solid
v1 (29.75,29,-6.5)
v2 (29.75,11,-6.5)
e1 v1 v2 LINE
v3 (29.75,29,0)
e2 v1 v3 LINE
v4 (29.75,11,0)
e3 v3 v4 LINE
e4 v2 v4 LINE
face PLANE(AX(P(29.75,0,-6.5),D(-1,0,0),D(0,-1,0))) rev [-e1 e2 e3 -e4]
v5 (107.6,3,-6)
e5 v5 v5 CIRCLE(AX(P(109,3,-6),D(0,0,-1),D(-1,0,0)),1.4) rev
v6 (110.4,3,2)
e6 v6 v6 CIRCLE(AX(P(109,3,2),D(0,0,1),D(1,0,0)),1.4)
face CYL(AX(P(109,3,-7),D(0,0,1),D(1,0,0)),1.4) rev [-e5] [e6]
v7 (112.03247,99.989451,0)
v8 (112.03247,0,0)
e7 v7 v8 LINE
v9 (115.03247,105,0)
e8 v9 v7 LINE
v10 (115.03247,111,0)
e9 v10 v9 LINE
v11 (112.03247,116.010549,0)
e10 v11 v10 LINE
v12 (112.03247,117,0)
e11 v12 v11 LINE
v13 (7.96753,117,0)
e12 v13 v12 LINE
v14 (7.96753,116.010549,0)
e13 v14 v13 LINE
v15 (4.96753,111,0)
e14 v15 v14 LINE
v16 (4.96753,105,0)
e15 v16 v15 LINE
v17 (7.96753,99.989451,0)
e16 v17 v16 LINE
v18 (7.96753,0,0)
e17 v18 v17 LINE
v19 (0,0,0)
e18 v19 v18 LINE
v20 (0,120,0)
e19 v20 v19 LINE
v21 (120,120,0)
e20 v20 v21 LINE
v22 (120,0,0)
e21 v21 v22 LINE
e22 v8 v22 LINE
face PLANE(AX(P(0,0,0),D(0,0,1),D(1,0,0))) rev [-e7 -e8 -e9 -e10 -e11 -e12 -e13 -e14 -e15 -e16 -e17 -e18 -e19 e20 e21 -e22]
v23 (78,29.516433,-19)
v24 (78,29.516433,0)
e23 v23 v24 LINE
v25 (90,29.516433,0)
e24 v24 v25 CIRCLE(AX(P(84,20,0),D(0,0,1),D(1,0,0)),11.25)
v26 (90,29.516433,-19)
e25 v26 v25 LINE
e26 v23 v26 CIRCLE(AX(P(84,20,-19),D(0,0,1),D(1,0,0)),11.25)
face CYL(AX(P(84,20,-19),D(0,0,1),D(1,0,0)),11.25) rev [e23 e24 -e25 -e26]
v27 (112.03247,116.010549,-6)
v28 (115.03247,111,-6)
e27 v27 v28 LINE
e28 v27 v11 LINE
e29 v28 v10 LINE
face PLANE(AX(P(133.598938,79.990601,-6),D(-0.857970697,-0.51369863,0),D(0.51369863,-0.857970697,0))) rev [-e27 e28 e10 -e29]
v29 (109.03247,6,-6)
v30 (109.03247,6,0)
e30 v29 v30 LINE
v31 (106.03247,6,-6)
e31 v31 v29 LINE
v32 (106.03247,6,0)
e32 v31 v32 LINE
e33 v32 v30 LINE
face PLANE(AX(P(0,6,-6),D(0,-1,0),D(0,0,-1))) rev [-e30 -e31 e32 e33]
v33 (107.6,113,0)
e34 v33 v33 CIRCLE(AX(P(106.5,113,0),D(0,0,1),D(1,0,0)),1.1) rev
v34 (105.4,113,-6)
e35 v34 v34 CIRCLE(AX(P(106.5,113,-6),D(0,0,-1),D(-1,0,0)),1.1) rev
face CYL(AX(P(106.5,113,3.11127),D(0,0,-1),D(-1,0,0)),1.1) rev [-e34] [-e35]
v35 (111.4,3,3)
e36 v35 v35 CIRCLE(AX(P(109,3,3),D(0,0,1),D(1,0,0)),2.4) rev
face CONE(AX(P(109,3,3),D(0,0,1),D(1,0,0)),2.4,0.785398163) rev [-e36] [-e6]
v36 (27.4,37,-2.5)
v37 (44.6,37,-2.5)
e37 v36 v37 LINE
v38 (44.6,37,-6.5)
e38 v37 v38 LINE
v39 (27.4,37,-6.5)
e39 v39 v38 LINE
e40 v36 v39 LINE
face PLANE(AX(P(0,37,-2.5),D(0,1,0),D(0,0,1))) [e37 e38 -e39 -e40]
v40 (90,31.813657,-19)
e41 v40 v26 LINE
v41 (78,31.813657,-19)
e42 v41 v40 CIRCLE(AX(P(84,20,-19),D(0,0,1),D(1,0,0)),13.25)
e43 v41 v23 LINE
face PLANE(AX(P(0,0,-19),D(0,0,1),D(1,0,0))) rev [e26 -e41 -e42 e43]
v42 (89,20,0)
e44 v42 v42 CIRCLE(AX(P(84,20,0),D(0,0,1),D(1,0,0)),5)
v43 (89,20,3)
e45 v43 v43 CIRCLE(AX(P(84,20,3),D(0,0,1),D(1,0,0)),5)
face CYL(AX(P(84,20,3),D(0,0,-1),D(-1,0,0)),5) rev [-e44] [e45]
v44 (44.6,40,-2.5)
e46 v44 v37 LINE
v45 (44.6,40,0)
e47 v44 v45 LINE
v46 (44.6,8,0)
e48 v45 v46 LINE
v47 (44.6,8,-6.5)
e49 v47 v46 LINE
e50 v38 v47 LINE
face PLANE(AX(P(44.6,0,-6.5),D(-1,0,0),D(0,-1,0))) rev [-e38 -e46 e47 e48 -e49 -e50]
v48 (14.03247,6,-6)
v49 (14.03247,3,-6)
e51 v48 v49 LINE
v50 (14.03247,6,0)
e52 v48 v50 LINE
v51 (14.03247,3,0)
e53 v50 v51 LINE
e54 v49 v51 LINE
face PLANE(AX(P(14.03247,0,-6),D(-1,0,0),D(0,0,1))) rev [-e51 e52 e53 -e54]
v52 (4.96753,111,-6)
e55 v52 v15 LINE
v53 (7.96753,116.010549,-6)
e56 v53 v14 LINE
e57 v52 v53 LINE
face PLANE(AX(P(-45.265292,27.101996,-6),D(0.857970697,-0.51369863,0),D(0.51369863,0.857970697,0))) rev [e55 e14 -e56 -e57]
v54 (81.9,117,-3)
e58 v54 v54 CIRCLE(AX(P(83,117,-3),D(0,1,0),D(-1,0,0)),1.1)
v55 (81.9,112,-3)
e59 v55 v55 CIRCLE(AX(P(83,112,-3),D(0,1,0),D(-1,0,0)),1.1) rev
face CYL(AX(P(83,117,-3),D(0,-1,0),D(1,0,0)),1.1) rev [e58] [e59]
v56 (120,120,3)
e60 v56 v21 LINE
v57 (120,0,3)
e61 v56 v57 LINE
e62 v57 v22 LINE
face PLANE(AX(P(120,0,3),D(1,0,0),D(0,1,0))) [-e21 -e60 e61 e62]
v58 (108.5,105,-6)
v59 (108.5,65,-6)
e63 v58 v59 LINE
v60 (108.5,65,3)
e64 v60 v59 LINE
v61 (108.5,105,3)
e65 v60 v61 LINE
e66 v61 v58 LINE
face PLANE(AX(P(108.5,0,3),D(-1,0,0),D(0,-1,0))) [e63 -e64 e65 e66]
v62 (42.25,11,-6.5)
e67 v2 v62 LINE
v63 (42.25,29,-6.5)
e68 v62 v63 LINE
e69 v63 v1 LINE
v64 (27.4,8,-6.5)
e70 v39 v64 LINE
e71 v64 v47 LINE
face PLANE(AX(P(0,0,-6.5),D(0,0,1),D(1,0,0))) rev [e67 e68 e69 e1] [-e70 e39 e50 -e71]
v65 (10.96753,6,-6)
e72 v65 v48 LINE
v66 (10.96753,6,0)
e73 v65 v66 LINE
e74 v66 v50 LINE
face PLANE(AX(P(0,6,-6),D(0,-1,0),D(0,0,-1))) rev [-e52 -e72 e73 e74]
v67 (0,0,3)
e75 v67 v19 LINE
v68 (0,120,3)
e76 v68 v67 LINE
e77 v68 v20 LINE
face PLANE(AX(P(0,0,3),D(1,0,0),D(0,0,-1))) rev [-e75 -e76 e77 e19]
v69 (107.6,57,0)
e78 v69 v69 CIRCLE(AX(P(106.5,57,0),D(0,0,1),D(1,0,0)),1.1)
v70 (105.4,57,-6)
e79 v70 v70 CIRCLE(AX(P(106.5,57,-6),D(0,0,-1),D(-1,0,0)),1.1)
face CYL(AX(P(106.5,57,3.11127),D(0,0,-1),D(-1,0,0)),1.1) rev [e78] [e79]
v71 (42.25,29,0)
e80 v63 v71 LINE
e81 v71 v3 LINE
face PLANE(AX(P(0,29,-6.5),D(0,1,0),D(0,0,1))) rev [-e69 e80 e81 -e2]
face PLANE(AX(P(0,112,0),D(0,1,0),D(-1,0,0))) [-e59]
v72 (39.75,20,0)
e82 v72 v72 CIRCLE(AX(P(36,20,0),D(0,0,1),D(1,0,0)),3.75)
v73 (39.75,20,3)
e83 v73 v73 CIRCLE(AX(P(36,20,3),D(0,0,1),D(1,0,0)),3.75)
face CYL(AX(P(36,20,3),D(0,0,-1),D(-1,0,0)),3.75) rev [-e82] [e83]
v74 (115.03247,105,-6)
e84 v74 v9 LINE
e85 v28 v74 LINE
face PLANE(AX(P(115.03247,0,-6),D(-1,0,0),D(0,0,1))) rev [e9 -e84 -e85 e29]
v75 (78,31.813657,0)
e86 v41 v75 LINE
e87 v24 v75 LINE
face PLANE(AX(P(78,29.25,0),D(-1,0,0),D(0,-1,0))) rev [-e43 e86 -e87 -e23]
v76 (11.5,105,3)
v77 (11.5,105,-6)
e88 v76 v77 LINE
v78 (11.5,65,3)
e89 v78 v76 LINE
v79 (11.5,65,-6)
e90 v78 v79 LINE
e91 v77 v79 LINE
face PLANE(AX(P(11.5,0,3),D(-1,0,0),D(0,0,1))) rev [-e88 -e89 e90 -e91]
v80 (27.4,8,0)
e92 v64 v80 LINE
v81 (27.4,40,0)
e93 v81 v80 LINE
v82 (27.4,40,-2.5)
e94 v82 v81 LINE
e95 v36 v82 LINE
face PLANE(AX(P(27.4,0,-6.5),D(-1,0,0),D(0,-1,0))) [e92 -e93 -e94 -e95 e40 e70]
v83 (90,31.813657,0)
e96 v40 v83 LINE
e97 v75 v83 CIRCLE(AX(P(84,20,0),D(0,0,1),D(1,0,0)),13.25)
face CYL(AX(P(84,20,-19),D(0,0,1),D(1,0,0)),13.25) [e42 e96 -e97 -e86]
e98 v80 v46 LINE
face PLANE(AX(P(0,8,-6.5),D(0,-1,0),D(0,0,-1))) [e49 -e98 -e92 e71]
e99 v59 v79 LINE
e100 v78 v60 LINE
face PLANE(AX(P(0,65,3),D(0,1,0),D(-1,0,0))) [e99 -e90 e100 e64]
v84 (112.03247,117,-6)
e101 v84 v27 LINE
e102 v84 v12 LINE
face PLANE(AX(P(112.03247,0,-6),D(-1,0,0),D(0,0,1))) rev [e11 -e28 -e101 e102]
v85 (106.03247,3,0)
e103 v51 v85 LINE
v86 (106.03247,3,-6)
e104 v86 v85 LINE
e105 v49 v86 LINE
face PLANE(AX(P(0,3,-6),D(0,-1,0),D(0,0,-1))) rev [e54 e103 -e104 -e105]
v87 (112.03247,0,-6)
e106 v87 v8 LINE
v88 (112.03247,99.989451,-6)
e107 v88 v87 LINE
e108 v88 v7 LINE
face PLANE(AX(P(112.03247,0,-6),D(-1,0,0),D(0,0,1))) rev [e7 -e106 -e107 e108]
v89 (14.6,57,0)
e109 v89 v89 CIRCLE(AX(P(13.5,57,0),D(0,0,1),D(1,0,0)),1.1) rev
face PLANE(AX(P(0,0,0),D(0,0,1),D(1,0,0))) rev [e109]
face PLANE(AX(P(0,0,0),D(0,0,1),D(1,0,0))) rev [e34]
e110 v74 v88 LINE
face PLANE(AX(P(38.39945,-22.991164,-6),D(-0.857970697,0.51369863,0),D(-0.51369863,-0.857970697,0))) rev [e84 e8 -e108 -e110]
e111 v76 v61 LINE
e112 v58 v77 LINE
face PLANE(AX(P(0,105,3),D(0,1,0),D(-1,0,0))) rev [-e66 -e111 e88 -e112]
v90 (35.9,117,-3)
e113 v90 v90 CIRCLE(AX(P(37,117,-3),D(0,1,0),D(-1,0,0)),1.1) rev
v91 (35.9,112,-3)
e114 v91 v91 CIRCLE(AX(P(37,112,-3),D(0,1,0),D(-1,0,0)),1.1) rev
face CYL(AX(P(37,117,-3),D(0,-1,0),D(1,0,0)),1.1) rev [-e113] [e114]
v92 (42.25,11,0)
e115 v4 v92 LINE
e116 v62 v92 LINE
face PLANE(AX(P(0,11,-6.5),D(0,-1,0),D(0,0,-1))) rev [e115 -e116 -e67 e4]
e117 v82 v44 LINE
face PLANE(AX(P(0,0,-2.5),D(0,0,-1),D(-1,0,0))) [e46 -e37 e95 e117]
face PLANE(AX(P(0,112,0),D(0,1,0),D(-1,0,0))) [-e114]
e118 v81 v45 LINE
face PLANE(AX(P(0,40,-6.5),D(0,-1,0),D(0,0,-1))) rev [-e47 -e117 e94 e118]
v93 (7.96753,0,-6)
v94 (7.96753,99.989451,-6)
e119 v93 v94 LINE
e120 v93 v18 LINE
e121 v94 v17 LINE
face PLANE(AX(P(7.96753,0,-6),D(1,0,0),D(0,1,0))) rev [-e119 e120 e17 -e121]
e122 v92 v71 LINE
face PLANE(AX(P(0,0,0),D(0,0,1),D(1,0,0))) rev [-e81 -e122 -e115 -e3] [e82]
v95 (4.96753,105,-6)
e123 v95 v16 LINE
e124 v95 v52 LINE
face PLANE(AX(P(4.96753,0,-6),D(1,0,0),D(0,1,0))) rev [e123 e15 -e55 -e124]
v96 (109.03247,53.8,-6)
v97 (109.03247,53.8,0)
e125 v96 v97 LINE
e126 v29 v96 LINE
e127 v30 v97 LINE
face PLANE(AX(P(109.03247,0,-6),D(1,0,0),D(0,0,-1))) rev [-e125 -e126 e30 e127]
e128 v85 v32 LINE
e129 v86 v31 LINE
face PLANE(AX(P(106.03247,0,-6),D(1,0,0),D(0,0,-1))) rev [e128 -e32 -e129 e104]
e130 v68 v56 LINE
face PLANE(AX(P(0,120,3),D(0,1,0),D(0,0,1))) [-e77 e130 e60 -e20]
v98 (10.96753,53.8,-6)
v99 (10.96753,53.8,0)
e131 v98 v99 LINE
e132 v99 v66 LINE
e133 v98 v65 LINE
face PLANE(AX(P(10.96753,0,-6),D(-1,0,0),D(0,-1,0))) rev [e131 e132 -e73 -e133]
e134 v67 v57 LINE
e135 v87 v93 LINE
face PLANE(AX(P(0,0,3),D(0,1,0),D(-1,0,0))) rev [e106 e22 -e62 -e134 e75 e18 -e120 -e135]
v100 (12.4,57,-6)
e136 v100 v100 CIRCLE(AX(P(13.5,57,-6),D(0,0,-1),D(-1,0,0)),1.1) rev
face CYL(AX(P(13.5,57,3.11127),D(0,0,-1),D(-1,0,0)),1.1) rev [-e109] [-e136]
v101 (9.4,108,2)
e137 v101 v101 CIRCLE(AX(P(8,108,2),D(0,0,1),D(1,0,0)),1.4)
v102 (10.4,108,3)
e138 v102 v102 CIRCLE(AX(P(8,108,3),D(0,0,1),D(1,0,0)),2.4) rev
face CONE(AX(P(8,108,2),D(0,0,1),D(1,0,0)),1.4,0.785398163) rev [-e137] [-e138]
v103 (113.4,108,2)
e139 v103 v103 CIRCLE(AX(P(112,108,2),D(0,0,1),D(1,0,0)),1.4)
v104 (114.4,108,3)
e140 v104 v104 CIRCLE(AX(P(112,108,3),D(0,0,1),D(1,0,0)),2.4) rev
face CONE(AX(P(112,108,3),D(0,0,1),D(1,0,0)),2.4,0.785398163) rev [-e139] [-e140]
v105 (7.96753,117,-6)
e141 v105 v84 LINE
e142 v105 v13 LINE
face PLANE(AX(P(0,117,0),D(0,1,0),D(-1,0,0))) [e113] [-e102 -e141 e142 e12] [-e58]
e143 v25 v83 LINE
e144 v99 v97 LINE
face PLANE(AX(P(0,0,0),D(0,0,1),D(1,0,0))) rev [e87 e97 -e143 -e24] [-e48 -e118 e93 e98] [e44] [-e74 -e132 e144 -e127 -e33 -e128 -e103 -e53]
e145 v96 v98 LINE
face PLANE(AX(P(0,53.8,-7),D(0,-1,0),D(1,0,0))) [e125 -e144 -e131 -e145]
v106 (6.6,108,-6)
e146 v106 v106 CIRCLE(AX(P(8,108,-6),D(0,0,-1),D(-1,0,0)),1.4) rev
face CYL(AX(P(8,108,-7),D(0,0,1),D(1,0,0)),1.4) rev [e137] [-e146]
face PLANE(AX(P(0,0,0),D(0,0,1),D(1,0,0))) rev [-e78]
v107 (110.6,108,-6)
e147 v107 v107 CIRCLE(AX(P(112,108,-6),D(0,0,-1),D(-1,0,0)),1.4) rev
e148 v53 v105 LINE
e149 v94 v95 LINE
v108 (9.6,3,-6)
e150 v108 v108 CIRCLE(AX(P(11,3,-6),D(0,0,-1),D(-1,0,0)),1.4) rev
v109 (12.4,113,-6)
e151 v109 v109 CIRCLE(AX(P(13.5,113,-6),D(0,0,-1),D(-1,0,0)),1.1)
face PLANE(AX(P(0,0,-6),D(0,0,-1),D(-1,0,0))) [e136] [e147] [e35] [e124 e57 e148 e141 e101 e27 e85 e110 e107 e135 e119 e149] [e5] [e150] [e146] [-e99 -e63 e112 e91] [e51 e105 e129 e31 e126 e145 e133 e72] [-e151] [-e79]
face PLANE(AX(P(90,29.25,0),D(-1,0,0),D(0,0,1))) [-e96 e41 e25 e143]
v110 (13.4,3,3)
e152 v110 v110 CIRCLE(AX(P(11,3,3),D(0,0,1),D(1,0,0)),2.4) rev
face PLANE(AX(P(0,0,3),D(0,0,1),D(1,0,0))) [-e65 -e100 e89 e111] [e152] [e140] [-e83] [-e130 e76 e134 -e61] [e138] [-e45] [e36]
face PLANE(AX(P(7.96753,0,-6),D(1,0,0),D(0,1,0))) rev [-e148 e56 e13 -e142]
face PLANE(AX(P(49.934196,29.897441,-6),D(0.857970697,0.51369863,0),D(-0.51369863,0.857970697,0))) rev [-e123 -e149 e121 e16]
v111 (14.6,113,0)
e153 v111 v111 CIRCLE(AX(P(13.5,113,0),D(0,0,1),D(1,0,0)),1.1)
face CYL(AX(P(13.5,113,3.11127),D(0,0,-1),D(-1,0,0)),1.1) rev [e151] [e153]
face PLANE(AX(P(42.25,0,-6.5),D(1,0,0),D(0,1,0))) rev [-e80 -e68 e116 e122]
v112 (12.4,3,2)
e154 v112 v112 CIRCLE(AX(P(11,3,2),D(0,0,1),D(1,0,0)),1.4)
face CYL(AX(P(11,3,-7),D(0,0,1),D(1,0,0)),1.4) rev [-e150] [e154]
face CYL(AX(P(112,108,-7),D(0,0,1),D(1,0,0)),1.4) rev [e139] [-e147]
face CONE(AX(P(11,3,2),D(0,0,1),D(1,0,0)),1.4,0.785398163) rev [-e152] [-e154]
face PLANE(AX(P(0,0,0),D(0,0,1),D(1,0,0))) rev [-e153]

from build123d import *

# Parameters (mm, degrees)
SZKIC1_W                        = 120
SZKIC1_H                        = 120
SZKIC1_R                        = 3.75
SZKIC1_R_2                      = 5
SZKIC1_W_2                      = 97
SZKIC1_H_2                      = 40
DODANIE_WYCI_GNI_CIE1_DEPTH     = 3
SZKIC1_4_W                      = 17.2
SZKIC1_4_H                      = 32
DODANIE_WYCI_GNI_CIE3_DEPTH     = 6.5
SZKIC1_7_W                      = 97
SZKIC1_7_H                      = 40
DODANIE_WYCI_GNI_CIE4_DEPTH     = 7
SZKIC9_W                        = 40
SZKIC9_H                        = 4
WYTNIJ_WYCI_GNI_CIE10_DEPTH     = 1
SZKIC7_R                        = 1.4
WYTNIJ_WYCI_GNI_CIE11_DEPTH     = 10
SZKIC1_8_R                      = 13.25
SZKIC1_8_R_2                    = 11.25
DODANIE_WYCI_GNI_CIE5_DEPTH     = 19
SZKIC11_W                       = 17.2
SZKIC11_H                       = 3
WYTNIJ_WYCI_GNI_CIE13_DEPTH     = 4
SZKIC12_W                       = 12
SZKIC12_H                       = 19
WYTNIJ_WYCI_GNI_CIE14_DEPTH     = 4
SZKIC13_R                       = 1.1
WYTNIJ_WYCI_GNI_CIE15_DEPTH     = 7
SZKIC14_W                       = 6
SZKIC14_H                       = 6
SZKIC14_R                       = 1.1
DODANIE_WYCI_GNI_CIE6_DEPTH     = 0.8
DODANIE_WYCI_GNI_CIE7_DEPTH     = 0.8
SFAZOWANIE1_SIZE                = 1
SFAZOWANIE2_SIZE                = 1
SFAZOWANIE3_SIZE                = 1
SFAZOWANIE4_SIZE                = 1
SZKIC17_R                       = 1.4
DODANIE_WYCI_GNI_CIE9_DEPTH     = 6
SZKIC18_W                       = 99.4
SZKIC18_H                       = 63.2
WYTNIJ_WYCI_GNI_CIE16_DEPTH     = 1
WYTNIJ_WYCI_GNI_CIE17_START     = -5
WYTNIJ_WYCI_GNI_CIE17_OUTLINE_R = 1.1
WYTNIJ_WYCI_GNI_CIE17_DEPTH     = 4.2


# Read off the part's stored shape, not the designer's step: Wytnij-wyciągnięcie17
with BuildPart() as part:
    # Szkic1 → Dodanie-wyciągnięcie1 (new body)
    with BuildSketch(Plane.XY):
        with Locations((60, 60)):
            Rectangle(SZKIC1_W, SZKIC1_H)
        with Locations((36, 20)):
            Circle(SZKIC1_R, mode=Mode.SUBTRACT)
        with Locations((84, 20)):
            Circle(SZKIC1_R_2, mode=Mode.SUBTRACT)
        with Locations((60, 85)):
            Rectangle(SZKIC1_W_2, SZKIC1_H_2, mode=Mode.SUBTRACT)
    extrude(amount=DODANIE_WYCI_GNI_CIE1_DEPTH)

    # Szkic1<7> → Dodanie-wyciągnięcie4 (add)
    # profile 1 of 4: a face of its own
    with BuildSketch(Plane.XY):
        Polygon((11.5, 115), (10.3, 115), (10.3, 55), (11.5, 55), (108.5, 55), (109.7, 55), (109.7, 115), (108.5, 115), align=None)
        with Locations((60, 85)):
            Rectangle(SZKIC1_7_W, SZKIC1_7_H, mode=Mode.SUBTRACT)
    # profile 2 of 4: a face of its own
    with BuildSketch(Plane.XY):
        Polygon((11.5, 115), (10.3, 115), (10.3, 55), (11.5, 55), (108.5, 55), (109.7, 55), (109.7, 115), (108.5, 115), align=None)
        with Locations((60, 85)):
            Rectangle(SZKIC1_7_W, SZKIC1_7_H, mode=Mode.SUBTRACT)
    # profile 3 of 4: a face of its own
    with BuildSketch(Plane.XY):
        Polygon((11.5, 115), (10.3, 115), (10.3, 116.2), (109.7, 116.2), (109.7, 115), (108.5, 115), align=None)
    # profile 4 of 4: a face of its own
    with BuildSketch(Plane.XY):
        Polygon((10.3, 53.8), (109.7, 53.8), (109.7, 55), (108.5, 55), (11.5, 55), (10.3, 55), align=None)
    extrude(amount=-DODANIE_WYCI_GNI_CIE4_DEPTH)

    # Szkic9 → Wytnij-wyciągnięcie10 (cut)
    with BuildSketch(Plane(origin=(0, 0, -7), x_dir=(-1, 0, 0), z_dir=(0, 0, -1))):
        with Locations((-40.5, 113)):
            Rectangle(SZKIC9_W, SZKIC9_H)
    extrude(amount=-WYTNIJ_WYCI_GNI_CIE10_DEPTH, mode=Mode.SUBTRACT)

    # Szkic7 → Wytnij-wyciągnięcie11 (cut)
    with BuildSketch(Plane.XY.offset(3)):
        with Locations((11, 3)):
            Circle(SZKIC7_R)
        with Locations((109, 3)):
            Circle(SZKIC7_R)
        with Locations((8, 108)):
            Circle(SZKIC7_R)
        with Locations((112, 108)):
            Circle(SZKIC7_R)
    extrude(amount=-WYTNIJ_WYCI_GNI_CIE11_DEPTH, mode=Mode.SUBTRACT)

    # Szkic1<8> → Dodanie-wyciągnięcie5 (add)
    with BuildSketch(Plane.XY):
        with Locations((84, 20)):
            Circle(SZKIC1_8_R)
        with Locations((84, 20)):
            Circle(SZKIC1_8_R_2, mode=Mode.SUBTRACT)
    extrude(amount=-DODANIE_WYCI_GNI_CIE5_DEPTH)

    # Szkic12 → Wytnij-wyciągnięcie14 (cut)
    with BuildSketch(Plane(origin=(0, 33.25, 0), x_dir=(1, 0, 0), z_dir=(0, 1, 0))):
        with Locations((84, 9.5)):
            Rectangle(SZKIC12_W, SZKIC12_H)
    extrude(amount=-WYTNIJ_WYCI_GNI_CIE14_DEPTH, mode=Mode.SUBTRACT)

    # Szkic13 → Wytnij-wyciągnięcie15 (cut)
    with BuildSketch(Plane(origin=(0, 0, -7), x_dir=(-1, 0, 0), z_dir=(0, 0, -1))):
        with Locations((-106.5, 113)):
            Circle(SZKIC13_R)
        with Locations((-13.5, 113)):
            Circle(SZKIC13_R)
        with Locations((-106.5, 57)):
            Circle(SZKIC13_R)
        with Locations((-13.5, 57)):
            Circle(SZKIC13_R)
    extrude(amount=-WYTNIJ_WYCI_GNI_CIE15_DEPTH, mode=Mode.SUBTRACT)

    # Szkic14 → Dodanie-wyciągnięcie6 (add)
    # profile 1 of 2: a face of its own
    with BuildSketch(Plane(origin=(0, 116.2, 0), x_dir=(1, 0, 0), z_dir=(0, 1, 0))):
        with Locations((37, 3)):
            Rectangle(SZKIC14_W, SZKIC14_H)
        with Locations((37, 3)):
            Circle(SZKIC14_R, mode=Mode.SUBTRACT)
    # profile 2 of 2: a face of its own
    with BuildSketch(Plane(origin=(0, 116.2, 0), x_dir=(1, 0, 0), z_dir=(0, 1, 0))):
        with Locations((83, 3)):
            Rectangle(SZKIC14_W, SZKIC14_H)
        with Locations(Location((83, 3, 0), (0, 0, 180))):
            Circle(SZKIC14_R, mode=Mode.SUBTRACT)
    extrude(amount=DODANIE_WYCI_GNI_CIE6_DEPTH)

    # Szkic15 → Dodanie-wyciągnięcie7 (add)
    with BuildSketch(Plane(origin=(0, 116.2, 0), x_dir=(1, 0, 0), z_dir=(0, 1, 0))):
        Polygon((109.7, 0), (109.7, 7), (10.3, 7), (10.3, 0), (34, 0), (34, 6), (40, 6), (40, 0), (80, 0), (80, 6), (86, 6), (86, 0), align=None)
    extrude(amount=DODANIE_WYCI_GNI_CIE7_DEPTH)

    # Sfazowanie1
    sfazowanie1_edges = [part.edges().sort_by_distance(p)[0] for p in [
        (6.6, 108, 3),
    ]]
    chamfer(sfazowanie1_edges, length=SFAZOWANIE1_SIZE)

    # Sfazowanie2
    sfazowanie2_edges = [part.edges().sort_by_distance(p)[0] for p in [
        (110.6, 108, 3),
    ]]
    chamfer(sfazowanie2_edges, length=SFAZOWANIE2_SIZE)

    # Sfazowanie3
    sfazowanie3_edges = [part.edges().sort_by_distance(p)[0] for p in [
        (9.6, 3, 3),
    ]]
    chamfer(sfazowanie3_edges, length=SFAZOWANIE3_SIZE)

    # Sfazowanie4
    sfazowanie4_edges = [part.edges().sort_by_distance(p)[0] for p in [
        (107.6, 3, 3),
    ]]
    chamfer(sfazowanie4_edges, length=SFAZOWANIE4_SIZE)


with BuildPart() as body_2:
    # Szkic1<4> → Dodanie-wyciągnięcie3 (new body)
    with BuildSketch(Plane.XY):
        with Locations((36, 24)):
            Rectangle(SZKIC1_4_W, SZKIC1_4_H)
        Polygon((29.75, 11), (29.75, 26), (29.75, 29), (42.25, 29), (42.25, 26), (42.25, 11), align=None, mode=Mode.SUBTRACT)
    extrude(amount=-DODANIE_WYCI_GNI_CIE3_DEPTH)

    # Szkic11 → Wytnij-wyciągnięcie13 (cut)
    with BuildSketch(Plane(origin=(0, 0, -6.5), x_dir=(-1, 0, 0), z_dir=(0, 0, -1))):
        with Locations((-36, 38.5)):
            Rectangle(SZKIC11_W, SZKIC11_H)
    extrude(amount=-WYTNIJ_WYCI_GNI_CIE13_DEPTH, mode=Mode.SUBTRACT)


    add(part.part)  # Dodanie-wyciągnięcie9 merges part
    # Szkic17 → Dodanie-wyciągnięcie9 (add)
    with BuildSketch(Plane(origin=(0, 0, 0), x_dir=(-1, 0, 0), z_dir=(0, 0, -1))):
        Polygon((-106.03246961, 3), (-106.03246961, 6), (-109.03246961, 6), (-109.03246961, 117), (-112.03246961, 117), (-112.03246961, 116.010548872), (-115.03246961, 111), (-115.03246961, 105), (-112.03246961, 99.989451128), (-112.03246961, 0), (-7.96753039, 0), (-7.96753039, 99.989451128), (-4.96753039, 105), (-4.96753039, 111), (-7.96753039, 116.010548872), (-7.96753039, 117), (-10.96753039, 117), (-10.96753039, 6), (-14.03246961, 6), (-14.03246961, 3), align=None)
        with Locations(Location((-112, 108, 0), (0, 0, 180))):
            Circle(SZKIC17_R, mode=Mode.SUBTRACT)
        with Locations(Location((-8, 108, 0), (0, 0, 180))):
            Circle(SZKIC17_R, mode=Mode.SUBTRACT)
        with Locations(Location((-11, 3, 0), (0, 0, 180))):
            Circle(SZKIC17_R, mode=Mode.SUBTRACT)
        with Locations(Location((-109, 3, 0), (0, 0, 180))):
            Circle(SZKIC17_R, mode=Mode.SUBTRACT)
    extrude(amount=DODANIE_WYCI_GNI_CIE9_DEPTH)

    # Szkic18 → Wytnij-wyciągnięcie16 (cut)
    with BuildSketch(Plane(origin=(0, 0, -7), x_dir=(-1, 0, 0), z_dir=(0, 0, -1))):
        with Locations((-60, 85.4)):
            Rectangle(SZKIC18_W, SZKIC18_H)
    extrude(amount=-WYTNIJ_WYCI_GNI_CIE16_DEPTH, mode=Mode.SUBTRACT)

    # Wytnij-wyciągnięcie17 outline → Wytnij-wyciągnięcie17 (cut)
    with BuildSketch(Plane(origin=(0, 117, 0), x_dir=(1, 0, 0), z_dir=(0, 1, 0)).offset(WYTNIJ_WYCI_GNI_CIE17_START)):
        with Locations((37, 3)):
            Circle(WYTNIJ_WYCI_GNI_CIE17_OUTLINE_R)
        with Locations((83, 3)):
            Circle(WYTNIJ_WYCI_GNI_CIE17_OUTLINE_R)
    extrude(amount=WYTNIJ_WYCI_GNI_CIE17_DEPTH, mode=Mode.SUBTRACT)


solid = body_2.part
